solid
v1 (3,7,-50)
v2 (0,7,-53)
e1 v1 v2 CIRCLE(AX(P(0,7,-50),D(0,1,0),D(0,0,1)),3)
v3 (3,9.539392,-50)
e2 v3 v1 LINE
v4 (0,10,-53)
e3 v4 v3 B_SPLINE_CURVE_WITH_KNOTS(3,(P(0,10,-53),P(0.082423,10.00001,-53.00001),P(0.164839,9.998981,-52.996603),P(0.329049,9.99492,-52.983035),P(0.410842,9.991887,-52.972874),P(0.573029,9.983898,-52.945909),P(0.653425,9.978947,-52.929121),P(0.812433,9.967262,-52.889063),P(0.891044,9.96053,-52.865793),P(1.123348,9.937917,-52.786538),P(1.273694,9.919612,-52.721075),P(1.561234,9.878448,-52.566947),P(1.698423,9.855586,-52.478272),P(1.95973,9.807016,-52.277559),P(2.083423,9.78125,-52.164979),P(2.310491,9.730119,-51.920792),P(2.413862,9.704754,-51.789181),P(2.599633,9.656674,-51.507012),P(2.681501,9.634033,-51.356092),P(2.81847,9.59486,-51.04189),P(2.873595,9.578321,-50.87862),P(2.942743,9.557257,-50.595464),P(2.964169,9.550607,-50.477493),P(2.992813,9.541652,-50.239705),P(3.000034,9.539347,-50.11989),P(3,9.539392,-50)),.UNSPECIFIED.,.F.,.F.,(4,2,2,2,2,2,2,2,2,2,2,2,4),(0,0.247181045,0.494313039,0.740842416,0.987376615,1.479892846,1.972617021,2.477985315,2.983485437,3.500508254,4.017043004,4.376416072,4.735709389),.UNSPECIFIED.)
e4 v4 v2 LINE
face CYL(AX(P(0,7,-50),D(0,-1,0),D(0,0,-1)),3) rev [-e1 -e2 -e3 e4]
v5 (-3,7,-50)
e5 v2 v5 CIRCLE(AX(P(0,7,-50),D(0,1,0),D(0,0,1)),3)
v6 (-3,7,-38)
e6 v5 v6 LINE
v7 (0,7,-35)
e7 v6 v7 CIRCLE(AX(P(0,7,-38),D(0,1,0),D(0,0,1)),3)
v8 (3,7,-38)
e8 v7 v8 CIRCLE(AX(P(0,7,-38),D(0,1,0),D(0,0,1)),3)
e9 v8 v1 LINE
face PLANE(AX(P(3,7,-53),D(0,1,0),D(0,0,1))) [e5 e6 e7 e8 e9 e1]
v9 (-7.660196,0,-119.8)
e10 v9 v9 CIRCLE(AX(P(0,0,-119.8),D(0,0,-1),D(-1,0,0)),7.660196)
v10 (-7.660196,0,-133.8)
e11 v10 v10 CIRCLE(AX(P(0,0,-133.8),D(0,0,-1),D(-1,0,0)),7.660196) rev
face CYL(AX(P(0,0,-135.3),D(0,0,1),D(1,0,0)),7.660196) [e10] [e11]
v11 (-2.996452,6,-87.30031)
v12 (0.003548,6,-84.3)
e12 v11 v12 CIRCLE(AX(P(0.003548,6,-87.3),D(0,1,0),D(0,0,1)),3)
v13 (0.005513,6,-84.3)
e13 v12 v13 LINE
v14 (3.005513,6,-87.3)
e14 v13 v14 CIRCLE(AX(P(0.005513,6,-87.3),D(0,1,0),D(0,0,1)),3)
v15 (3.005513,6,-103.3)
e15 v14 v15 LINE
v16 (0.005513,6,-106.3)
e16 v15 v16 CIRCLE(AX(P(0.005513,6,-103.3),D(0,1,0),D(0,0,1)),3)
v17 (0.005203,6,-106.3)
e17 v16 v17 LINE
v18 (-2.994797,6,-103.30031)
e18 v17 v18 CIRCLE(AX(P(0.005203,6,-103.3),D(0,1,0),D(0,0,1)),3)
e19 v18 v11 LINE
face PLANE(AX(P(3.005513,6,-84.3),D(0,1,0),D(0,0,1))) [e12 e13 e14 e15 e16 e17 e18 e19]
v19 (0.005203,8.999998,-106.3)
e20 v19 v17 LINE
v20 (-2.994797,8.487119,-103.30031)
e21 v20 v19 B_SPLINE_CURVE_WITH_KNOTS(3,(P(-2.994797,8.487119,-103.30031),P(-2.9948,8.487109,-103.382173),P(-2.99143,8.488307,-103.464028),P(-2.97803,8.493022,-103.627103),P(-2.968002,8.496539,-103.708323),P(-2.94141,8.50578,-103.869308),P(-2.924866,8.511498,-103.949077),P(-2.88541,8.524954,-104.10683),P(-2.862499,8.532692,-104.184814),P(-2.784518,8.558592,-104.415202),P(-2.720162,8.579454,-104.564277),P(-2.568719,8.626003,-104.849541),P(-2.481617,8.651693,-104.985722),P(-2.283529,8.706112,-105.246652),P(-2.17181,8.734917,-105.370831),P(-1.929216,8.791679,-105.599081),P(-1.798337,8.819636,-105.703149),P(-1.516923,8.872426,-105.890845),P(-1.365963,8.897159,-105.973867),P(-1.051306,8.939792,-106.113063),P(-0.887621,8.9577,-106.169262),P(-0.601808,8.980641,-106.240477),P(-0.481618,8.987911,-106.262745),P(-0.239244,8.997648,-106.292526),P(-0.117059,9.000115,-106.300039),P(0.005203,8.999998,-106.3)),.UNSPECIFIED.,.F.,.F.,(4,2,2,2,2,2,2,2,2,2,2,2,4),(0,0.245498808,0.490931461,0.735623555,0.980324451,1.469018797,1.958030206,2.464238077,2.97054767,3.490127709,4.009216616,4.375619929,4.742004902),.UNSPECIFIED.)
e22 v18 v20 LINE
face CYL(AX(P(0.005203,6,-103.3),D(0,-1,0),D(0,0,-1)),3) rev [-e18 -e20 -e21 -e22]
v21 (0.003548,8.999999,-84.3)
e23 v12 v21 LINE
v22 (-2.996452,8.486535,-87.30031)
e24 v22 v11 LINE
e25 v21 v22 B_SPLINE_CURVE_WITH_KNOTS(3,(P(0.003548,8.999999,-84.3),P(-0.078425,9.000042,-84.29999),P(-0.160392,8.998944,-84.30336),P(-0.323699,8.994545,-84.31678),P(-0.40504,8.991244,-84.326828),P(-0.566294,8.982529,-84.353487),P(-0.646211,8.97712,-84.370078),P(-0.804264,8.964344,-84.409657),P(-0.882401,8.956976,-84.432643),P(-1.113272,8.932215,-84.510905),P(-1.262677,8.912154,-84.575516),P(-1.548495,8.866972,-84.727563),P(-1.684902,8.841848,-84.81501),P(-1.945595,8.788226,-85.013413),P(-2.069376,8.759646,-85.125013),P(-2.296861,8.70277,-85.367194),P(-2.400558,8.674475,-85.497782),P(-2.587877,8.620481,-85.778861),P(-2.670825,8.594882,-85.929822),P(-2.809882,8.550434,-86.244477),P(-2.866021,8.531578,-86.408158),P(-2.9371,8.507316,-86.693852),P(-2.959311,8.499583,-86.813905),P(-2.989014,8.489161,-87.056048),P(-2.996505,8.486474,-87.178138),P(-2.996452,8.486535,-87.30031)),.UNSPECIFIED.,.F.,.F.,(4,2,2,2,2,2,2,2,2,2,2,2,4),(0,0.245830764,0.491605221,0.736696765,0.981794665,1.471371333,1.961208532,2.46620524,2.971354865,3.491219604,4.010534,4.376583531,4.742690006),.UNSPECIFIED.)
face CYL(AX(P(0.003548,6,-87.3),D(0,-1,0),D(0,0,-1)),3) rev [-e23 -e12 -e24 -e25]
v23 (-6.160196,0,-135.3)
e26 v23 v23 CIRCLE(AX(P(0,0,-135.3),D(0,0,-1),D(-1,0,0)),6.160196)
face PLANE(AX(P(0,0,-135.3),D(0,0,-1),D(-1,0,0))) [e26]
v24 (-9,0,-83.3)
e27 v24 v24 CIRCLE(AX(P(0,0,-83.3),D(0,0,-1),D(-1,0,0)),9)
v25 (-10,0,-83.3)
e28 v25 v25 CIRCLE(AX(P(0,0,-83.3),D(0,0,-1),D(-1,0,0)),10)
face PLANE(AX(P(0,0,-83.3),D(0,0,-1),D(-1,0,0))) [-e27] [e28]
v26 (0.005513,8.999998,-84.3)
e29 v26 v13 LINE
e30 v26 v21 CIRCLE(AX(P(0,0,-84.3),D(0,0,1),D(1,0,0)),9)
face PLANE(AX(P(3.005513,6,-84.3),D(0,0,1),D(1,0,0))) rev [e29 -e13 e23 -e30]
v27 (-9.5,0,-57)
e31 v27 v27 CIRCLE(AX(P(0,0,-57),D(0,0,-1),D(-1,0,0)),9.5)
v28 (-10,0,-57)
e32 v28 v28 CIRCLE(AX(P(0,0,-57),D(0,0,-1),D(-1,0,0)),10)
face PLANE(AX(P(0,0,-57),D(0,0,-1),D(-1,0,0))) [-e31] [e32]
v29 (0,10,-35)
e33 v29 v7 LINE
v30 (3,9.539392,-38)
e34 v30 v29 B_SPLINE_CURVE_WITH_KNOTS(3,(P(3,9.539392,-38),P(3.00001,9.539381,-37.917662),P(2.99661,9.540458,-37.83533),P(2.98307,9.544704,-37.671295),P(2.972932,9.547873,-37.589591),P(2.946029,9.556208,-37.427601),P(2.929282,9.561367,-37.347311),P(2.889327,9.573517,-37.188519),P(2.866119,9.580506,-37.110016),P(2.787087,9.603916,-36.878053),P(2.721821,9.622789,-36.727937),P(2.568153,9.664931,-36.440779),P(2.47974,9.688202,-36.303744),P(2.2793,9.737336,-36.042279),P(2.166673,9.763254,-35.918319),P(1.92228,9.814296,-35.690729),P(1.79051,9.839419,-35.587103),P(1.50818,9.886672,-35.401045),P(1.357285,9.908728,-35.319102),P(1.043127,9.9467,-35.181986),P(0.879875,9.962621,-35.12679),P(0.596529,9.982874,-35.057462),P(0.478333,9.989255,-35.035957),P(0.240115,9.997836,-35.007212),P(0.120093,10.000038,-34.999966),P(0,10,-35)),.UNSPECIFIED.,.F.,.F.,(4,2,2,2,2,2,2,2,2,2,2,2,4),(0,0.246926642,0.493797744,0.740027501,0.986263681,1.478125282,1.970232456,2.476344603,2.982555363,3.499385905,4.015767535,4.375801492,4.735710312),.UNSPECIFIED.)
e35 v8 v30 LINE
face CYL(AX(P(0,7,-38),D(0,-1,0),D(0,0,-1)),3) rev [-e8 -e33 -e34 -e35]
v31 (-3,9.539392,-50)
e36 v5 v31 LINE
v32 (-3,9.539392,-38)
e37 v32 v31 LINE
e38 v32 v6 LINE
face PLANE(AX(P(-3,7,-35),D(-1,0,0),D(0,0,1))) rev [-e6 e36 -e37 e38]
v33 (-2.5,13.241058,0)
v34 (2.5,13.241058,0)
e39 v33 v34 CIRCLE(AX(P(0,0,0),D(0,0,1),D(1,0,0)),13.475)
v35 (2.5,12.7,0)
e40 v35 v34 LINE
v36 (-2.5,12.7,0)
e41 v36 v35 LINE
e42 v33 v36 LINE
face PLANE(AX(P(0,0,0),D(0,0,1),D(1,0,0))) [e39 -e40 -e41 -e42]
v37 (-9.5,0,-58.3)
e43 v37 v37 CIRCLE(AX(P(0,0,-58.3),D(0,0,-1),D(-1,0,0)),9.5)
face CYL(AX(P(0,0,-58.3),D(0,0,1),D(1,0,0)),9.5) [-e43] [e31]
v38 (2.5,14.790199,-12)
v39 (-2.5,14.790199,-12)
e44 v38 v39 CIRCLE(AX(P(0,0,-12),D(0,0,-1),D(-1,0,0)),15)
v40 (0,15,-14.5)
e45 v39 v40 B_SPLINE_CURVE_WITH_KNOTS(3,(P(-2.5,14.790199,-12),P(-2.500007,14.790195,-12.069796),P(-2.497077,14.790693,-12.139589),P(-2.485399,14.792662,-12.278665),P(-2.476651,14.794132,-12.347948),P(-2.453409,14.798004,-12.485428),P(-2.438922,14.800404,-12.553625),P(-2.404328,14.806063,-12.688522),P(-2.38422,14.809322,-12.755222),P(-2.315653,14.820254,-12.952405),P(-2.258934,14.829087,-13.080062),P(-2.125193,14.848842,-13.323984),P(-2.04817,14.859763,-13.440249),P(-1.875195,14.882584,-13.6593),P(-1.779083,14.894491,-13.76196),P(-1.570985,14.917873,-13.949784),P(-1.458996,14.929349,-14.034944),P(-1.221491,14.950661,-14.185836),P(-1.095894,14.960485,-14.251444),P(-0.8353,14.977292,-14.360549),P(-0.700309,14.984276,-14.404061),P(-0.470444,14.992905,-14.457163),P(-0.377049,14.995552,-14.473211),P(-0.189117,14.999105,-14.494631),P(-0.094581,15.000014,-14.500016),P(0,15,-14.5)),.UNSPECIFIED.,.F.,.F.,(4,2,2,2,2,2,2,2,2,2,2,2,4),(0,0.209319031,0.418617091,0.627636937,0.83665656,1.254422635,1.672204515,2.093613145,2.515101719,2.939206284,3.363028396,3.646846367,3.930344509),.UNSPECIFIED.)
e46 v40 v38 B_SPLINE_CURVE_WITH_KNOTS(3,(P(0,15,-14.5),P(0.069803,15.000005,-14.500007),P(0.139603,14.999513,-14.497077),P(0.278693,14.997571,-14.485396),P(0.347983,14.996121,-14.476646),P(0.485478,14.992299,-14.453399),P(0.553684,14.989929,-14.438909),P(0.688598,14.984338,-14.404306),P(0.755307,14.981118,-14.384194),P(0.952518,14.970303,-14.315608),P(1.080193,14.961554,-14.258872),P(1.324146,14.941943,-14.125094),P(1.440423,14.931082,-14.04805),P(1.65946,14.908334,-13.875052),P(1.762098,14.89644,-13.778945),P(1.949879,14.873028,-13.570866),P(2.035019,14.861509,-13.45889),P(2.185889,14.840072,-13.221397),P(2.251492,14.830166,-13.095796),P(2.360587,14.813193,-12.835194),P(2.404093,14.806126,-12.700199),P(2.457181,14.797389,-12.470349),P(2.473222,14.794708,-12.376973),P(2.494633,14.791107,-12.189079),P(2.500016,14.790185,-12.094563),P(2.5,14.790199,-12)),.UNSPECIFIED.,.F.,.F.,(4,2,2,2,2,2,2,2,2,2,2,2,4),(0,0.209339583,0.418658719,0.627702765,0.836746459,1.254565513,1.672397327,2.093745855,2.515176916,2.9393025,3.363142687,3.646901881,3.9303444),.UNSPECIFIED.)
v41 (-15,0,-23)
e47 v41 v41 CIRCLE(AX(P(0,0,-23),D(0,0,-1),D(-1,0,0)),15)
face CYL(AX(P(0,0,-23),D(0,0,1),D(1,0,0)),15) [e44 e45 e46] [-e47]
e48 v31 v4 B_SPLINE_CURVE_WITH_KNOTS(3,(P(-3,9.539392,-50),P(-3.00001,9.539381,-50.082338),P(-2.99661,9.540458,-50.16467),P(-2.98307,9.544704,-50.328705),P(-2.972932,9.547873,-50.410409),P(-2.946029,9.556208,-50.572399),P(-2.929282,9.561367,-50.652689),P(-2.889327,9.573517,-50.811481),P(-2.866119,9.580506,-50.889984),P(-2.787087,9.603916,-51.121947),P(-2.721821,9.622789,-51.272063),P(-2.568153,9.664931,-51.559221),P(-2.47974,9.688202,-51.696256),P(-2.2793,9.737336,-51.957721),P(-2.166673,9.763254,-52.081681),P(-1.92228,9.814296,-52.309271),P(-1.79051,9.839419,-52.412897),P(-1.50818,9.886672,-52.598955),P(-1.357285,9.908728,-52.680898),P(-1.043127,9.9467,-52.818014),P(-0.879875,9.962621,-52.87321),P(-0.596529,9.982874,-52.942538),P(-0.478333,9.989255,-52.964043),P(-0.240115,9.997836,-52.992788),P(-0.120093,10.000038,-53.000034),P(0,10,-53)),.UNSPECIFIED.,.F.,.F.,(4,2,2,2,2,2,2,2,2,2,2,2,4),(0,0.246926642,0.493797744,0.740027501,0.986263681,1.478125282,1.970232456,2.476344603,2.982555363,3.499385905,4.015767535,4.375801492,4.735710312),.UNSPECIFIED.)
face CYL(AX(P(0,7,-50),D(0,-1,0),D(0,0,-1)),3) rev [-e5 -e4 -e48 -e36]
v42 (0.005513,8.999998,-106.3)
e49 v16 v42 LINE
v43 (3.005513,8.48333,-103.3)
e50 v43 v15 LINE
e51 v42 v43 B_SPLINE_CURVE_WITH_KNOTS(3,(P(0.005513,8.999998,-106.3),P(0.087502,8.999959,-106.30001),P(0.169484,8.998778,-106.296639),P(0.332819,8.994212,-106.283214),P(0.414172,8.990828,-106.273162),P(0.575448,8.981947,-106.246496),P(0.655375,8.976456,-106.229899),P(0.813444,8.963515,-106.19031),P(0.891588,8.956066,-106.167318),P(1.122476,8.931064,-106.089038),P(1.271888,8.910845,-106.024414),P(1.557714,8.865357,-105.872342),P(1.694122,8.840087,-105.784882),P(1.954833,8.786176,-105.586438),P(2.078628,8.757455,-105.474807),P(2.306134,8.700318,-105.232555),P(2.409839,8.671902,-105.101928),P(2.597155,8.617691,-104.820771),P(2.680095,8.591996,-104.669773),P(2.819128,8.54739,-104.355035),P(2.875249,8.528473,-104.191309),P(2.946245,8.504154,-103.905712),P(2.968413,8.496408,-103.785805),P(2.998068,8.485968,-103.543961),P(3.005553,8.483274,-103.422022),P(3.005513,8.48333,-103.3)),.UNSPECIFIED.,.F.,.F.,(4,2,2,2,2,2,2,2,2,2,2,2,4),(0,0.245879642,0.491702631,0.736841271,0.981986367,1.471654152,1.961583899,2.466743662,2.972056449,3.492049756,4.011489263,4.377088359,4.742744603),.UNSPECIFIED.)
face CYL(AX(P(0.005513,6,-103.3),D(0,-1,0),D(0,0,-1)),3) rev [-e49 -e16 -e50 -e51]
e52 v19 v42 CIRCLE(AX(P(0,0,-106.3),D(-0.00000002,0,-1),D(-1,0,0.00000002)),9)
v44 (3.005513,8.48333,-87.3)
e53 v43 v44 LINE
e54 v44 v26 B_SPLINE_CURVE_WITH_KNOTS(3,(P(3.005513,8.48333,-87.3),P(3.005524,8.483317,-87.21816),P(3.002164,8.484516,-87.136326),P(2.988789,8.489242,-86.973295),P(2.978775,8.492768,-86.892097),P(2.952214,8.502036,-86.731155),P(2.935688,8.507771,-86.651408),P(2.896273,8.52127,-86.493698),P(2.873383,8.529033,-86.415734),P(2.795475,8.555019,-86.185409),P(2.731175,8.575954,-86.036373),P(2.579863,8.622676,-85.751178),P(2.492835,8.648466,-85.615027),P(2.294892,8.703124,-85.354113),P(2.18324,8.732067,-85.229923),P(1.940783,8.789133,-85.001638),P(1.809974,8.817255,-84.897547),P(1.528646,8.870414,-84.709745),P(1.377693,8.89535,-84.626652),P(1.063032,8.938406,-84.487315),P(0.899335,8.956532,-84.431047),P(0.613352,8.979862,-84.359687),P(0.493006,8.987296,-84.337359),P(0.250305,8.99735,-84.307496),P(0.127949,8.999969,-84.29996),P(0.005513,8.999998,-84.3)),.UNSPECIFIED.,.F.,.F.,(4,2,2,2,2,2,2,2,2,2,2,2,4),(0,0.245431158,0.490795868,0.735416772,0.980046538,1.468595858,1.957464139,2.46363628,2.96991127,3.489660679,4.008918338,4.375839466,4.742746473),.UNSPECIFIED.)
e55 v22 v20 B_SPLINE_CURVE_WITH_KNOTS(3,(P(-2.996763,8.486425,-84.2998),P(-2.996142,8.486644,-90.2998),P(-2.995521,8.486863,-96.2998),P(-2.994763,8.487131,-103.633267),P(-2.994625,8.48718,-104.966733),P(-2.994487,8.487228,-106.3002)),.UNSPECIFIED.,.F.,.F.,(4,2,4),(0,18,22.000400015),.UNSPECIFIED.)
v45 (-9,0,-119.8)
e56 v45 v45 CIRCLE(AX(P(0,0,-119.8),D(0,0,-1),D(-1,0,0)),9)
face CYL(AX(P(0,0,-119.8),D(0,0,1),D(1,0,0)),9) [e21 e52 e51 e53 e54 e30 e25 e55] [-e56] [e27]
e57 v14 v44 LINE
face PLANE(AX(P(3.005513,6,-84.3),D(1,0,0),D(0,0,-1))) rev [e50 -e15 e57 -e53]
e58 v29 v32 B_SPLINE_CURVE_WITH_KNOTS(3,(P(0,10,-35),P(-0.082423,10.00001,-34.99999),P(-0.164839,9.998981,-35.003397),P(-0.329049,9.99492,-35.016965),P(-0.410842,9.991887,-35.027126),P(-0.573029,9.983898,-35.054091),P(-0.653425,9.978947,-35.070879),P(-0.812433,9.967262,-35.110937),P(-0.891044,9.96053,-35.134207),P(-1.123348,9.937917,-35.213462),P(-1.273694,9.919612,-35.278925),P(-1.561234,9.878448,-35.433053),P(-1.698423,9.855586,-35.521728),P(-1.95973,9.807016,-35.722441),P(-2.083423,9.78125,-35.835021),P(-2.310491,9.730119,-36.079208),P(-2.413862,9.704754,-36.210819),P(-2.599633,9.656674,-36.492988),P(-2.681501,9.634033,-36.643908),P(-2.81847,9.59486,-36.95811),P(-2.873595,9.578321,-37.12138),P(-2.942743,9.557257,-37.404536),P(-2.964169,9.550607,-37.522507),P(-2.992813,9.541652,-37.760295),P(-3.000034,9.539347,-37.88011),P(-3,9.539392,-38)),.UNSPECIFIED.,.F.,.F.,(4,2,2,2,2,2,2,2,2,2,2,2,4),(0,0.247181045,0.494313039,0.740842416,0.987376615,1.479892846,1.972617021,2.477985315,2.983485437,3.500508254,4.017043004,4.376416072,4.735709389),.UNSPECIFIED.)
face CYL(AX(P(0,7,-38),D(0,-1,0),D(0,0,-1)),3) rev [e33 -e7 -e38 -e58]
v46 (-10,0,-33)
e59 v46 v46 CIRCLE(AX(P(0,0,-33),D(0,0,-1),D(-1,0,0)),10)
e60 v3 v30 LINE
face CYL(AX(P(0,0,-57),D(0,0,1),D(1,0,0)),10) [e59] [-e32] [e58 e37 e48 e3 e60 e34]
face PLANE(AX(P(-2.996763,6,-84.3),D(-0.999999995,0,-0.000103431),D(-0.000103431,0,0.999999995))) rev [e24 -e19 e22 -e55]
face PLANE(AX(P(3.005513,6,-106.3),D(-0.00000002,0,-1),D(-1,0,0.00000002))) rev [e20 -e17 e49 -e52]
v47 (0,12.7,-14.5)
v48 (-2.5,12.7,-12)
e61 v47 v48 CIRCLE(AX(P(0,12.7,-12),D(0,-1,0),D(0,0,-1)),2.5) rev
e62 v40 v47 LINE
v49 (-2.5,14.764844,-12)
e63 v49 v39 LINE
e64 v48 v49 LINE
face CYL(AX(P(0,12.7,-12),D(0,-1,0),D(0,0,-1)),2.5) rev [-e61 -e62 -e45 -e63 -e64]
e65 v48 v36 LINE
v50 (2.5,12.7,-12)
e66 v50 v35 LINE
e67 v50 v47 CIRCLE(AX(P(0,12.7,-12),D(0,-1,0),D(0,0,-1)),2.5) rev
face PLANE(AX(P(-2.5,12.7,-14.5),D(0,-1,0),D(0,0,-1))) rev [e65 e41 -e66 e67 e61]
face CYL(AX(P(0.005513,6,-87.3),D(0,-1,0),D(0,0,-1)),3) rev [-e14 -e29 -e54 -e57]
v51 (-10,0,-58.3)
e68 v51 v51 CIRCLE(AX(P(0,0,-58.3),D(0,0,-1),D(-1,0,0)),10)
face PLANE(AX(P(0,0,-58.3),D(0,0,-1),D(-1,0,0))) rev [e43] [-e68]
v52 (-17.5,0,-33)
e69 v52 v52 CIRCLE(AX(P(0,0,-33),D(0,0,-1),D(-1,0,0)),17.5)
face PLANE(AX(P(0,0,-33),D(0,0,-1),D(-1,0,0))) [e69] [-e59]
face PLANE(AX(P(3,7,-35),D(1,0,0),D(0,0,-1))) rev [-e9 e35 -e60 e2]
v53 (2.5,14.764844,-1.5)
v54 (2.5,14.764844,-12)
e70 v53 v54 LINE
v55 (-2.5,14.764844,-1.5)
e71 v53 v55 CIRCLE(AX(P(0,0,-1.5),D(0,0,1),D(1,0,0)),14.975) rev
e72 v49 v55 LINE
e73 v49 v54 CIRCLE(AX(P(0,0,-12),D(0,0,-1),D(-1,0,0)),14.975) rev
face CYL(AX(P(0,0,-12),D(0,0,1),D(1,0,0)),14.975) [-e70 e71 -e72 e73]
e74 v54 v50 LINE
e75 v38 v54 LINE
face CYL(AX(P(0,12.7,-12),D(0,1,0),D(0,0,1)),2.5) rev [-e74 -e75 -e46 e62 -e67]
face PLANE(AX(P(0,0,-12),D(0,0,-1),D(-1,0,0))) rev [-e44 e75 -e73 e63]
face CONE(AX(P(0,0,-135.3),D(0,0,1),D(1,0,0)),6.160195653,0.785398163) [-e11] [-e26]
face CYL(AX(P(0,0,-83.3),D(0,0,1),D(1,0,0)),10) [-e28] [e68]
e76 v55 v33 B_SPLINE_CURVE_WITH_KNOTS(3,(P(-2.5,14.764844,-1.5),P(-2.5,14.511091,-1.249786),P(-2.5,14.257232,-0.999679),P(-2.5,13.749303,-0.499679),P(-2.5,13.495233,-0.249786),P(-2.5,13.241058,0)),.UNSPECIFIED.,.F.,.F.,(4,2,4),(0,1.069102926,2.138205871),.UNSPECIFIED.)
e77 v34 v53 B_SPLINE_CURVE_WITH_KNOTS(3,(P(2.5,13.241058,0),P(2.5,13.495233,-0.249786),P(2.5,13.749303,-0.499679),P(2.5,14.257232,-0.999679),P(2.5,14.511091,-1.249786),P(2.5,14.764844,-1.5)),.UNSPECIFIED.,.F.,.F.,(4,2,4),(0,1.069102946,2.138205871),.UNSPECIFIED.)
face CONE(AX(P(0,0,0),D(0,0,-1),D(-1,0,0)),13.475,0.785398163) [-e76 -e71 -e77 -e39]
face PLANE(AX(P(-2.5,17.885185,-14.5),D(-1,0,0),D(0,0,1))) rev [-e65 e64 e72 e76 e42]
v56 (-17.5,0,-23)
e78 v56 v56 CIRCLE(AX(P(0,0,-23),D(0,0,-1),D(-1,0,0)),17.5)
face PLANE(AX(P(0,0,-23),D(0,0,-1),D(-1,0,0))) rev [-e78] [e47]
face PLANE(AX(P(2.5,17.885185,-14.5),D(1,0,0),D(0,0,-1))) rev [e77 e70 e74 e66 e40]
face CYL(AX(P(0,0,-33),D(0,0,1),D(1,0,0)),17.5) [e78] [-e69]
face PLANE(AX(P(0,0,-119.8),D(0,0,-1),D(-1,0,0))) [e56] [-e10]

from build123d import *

# Parameters (mm, degrees)
SKETCH1_R          = 14.975
EXTRUDE1_DEPTH     = 12
SKETCH2_R          = 15
EXTRUDE2_DEPTH     = 11
SKETCH3_R          = 17.5
EXTRUDE3_DEPTH     = 10
SKETCH4_R          = 10
EXTRUDE4_DEPTH     = 24
SKETCH5_R          = 9.5
EXTRUDE5_DEPTH     = 1.3
SKETCH6_R          = 10
EXTRUDE6_DEPTH     = 25
SKETCH7_R          = 9
EXTRUDE7_DEPTH     = 36.5
SKETCH8_R          = 7.660195653
EXTRUDE8_DEPTH     = 15.5
SKETCH9_W          = 5
SKETCH9_H          = 5.185185185
CUT_EXTRUDE1_DEPTH = 14.5
FILLET1_R          = 2.5
CHAMFER1_SIZE      = 1.5
SKETCH10_W         = 6
SKETCH10_H         = 18
CUT_EXTRUDE2_DEPTH = 3
FILLET2_R          = 3
CUT_EXTRUDE3_DEPTH = 3
FILLET3_R          = 3
CHAMFER2_SIZE      = 1.5


with BuildPart() as part:
    # Sketch1 → Extrude1 (new body)
    with BuildSketch(Plane.XY):
        Circle(SKETCH1_R)
    extrude(amount=-EXTRUDE1_DEPTH)

    # Sketch2 → Extrude2 (add)
    with BuildSketch(Plane(origin=(0, 0, -12), x_dir=(-1, 0, 0), z_dir=(0, 0, -1))):
        Circle(SKETCH2_R)
    extrude(amount=EXTRUDE2_DEPTH)

    # Sketch3 → Extrude3 (add)
    with BuildSketch(Plane(origin=(0, 0, -23), x_dir=(-1, 0, 0), z_dir=(0, 0, -1))):
        Circle(SKETCH3_R)
    extrude(amount=EXTRUDE3_DEPTH)

    # Sketch4 → Extrude4 (add)
    with BuildSketch(Plane(origin=(0, 0, -33), x_dir=(-1, 0, 0), z_dir=(0, 0, -1))):
        Circle(SKETCH4_R)
    extrude(amount=EXTRUDE4_DEPTH)

    # Sketch5 → Extrude5 (add)
    with BuildSketch(Plane(origin=(0, 0, -57), x_dir=(-1, 0, 0), z_dir=(0, 0, -1))):
        Circle(SKETCH5_R)
    extrude(amount=EXTRUDE5_DEPTH)

    # Sketch6 → Extrude6 (add)
    with BuildSketch(Plane(origin=(0, 0, -58.3), x_dir=(-1, 0, 0), z_dir=(0, 0, -1))):
        Circle(SKETCH6_R)
    extrude(amount=EXTRUDE6_DEPTH)

    # Sketch7 → Extrude7 (add)
    with BuildSketch(Plane(origin=(0, 0, -83.3), x_dir=(-1, 0, 0), z_dir=(0, 0, -1))):
        Circle(SKETCH7_R)
    extrude(amount=EXTRUDE7_DEPTH)

    # Sketch8 → Extrude8 (add)
    with BuildSketch(Plane(origin=(0, 0, -119.8), x_dir=(-1, 0, 0), z_dir=(0, 0, -1))):
        Circle(SKETCH8_R)
    extrude(amount=EXTRUDE8_DEPTH)

    # Sketch9 → Cut-Extrude1 (cut)
    with BuildSketch(Plane.XY):
        with Locations((0, 15.292592593)):
            Rectangle(SKETCH9_W, SKETCH9_H)
    extrude(amount=-CUT_EXTRUDE1_DEPTH, mode=Mode.SUBTRACT)

    # Fillet1
    fillet1_edges = [part.edges().sort_by_distance(p)[0] for p in [
        (2.5, 13.745099729, -14.5),
        (-2.5, 13.745099729, -14.5),
    ]]
    fillet(fillet1_edges, radius=FILLET1_R - 0.0001)  # a hair under: the kernel refuses the full size

    # Chamfer1
    chamfer1_edges = [part.edges().sort_by_distance(p)[0] for p in [
        (0, -14.975, 0),
    ]]
    chamfer(chamfer1_edges, length=CHAMFER1_SIZE)

    # Sketch10 → Cut-Extrude2 (cut)
    with BuildSketch(Plane(origin=(0, 10, 0), x_dir=(-1, 0, 0), z_dir=(0, 1, 0))):
        with Locations((0, -44)):
            Rectangle(SKETCH10_W, SKETCH10_H)
    extrude(amount=-CUT_EXTRUDE2_DEPTH, mode=Mode.SUBTRACT)

    # Fillet2
    fillet2_edges = [part.edges().sort_by_distance(p)[0] for p in [
        (3, 8.269696007, -53),
        (-3, 8.269696007, -53),
        (-3, 8.269696007, -35),
        (3, 8.269696007, -35),
    ]]
    fillet(fillet2_edges, radius=FILLET2_R - 0.0001)  # a hair under: the kernel refuses the full size

    # Sketch11 → Cut-Extrude3 (cut)
    with BuildSketch(Plane(origin=(0, 9, 0), x_dir=(-1, 0, 0), z_dir=(0, 1, 0))):
        Polygon((-3.005512872, -84.3), (2.996762617, -84.3), (2.994487128, -106.299999882), (-3.005512872, -106.3), align=None)
    extrude(amount=-CUT_EXTRUDE3_DEPTH, mode=Mode.SUBTRACT)

    # Fillet3
    fillet3_edges = [part.edges().sort_by_distance(p)[0] for p in [
        (-2.994487128, 7.243614227, -106.299999882),
        (3.005512872, 7.241665132, -106.3),
        (3.005512872, 7.241665132, -84.3),
        (-2.996762617, 7.243212634, -84.3),
    ]]
    fillet(fillet3_edges, radius=FILLET3_R)

    # Chamfer2
    chamfer2_edges = [part.edges().sort_by_distance(p)[0] for p in [
        (7.660195653, 0, -135.3),
    ]]
    chamfer(chamfer2_edges, length=CHAMFER2_SIZE)


solid = part.part
